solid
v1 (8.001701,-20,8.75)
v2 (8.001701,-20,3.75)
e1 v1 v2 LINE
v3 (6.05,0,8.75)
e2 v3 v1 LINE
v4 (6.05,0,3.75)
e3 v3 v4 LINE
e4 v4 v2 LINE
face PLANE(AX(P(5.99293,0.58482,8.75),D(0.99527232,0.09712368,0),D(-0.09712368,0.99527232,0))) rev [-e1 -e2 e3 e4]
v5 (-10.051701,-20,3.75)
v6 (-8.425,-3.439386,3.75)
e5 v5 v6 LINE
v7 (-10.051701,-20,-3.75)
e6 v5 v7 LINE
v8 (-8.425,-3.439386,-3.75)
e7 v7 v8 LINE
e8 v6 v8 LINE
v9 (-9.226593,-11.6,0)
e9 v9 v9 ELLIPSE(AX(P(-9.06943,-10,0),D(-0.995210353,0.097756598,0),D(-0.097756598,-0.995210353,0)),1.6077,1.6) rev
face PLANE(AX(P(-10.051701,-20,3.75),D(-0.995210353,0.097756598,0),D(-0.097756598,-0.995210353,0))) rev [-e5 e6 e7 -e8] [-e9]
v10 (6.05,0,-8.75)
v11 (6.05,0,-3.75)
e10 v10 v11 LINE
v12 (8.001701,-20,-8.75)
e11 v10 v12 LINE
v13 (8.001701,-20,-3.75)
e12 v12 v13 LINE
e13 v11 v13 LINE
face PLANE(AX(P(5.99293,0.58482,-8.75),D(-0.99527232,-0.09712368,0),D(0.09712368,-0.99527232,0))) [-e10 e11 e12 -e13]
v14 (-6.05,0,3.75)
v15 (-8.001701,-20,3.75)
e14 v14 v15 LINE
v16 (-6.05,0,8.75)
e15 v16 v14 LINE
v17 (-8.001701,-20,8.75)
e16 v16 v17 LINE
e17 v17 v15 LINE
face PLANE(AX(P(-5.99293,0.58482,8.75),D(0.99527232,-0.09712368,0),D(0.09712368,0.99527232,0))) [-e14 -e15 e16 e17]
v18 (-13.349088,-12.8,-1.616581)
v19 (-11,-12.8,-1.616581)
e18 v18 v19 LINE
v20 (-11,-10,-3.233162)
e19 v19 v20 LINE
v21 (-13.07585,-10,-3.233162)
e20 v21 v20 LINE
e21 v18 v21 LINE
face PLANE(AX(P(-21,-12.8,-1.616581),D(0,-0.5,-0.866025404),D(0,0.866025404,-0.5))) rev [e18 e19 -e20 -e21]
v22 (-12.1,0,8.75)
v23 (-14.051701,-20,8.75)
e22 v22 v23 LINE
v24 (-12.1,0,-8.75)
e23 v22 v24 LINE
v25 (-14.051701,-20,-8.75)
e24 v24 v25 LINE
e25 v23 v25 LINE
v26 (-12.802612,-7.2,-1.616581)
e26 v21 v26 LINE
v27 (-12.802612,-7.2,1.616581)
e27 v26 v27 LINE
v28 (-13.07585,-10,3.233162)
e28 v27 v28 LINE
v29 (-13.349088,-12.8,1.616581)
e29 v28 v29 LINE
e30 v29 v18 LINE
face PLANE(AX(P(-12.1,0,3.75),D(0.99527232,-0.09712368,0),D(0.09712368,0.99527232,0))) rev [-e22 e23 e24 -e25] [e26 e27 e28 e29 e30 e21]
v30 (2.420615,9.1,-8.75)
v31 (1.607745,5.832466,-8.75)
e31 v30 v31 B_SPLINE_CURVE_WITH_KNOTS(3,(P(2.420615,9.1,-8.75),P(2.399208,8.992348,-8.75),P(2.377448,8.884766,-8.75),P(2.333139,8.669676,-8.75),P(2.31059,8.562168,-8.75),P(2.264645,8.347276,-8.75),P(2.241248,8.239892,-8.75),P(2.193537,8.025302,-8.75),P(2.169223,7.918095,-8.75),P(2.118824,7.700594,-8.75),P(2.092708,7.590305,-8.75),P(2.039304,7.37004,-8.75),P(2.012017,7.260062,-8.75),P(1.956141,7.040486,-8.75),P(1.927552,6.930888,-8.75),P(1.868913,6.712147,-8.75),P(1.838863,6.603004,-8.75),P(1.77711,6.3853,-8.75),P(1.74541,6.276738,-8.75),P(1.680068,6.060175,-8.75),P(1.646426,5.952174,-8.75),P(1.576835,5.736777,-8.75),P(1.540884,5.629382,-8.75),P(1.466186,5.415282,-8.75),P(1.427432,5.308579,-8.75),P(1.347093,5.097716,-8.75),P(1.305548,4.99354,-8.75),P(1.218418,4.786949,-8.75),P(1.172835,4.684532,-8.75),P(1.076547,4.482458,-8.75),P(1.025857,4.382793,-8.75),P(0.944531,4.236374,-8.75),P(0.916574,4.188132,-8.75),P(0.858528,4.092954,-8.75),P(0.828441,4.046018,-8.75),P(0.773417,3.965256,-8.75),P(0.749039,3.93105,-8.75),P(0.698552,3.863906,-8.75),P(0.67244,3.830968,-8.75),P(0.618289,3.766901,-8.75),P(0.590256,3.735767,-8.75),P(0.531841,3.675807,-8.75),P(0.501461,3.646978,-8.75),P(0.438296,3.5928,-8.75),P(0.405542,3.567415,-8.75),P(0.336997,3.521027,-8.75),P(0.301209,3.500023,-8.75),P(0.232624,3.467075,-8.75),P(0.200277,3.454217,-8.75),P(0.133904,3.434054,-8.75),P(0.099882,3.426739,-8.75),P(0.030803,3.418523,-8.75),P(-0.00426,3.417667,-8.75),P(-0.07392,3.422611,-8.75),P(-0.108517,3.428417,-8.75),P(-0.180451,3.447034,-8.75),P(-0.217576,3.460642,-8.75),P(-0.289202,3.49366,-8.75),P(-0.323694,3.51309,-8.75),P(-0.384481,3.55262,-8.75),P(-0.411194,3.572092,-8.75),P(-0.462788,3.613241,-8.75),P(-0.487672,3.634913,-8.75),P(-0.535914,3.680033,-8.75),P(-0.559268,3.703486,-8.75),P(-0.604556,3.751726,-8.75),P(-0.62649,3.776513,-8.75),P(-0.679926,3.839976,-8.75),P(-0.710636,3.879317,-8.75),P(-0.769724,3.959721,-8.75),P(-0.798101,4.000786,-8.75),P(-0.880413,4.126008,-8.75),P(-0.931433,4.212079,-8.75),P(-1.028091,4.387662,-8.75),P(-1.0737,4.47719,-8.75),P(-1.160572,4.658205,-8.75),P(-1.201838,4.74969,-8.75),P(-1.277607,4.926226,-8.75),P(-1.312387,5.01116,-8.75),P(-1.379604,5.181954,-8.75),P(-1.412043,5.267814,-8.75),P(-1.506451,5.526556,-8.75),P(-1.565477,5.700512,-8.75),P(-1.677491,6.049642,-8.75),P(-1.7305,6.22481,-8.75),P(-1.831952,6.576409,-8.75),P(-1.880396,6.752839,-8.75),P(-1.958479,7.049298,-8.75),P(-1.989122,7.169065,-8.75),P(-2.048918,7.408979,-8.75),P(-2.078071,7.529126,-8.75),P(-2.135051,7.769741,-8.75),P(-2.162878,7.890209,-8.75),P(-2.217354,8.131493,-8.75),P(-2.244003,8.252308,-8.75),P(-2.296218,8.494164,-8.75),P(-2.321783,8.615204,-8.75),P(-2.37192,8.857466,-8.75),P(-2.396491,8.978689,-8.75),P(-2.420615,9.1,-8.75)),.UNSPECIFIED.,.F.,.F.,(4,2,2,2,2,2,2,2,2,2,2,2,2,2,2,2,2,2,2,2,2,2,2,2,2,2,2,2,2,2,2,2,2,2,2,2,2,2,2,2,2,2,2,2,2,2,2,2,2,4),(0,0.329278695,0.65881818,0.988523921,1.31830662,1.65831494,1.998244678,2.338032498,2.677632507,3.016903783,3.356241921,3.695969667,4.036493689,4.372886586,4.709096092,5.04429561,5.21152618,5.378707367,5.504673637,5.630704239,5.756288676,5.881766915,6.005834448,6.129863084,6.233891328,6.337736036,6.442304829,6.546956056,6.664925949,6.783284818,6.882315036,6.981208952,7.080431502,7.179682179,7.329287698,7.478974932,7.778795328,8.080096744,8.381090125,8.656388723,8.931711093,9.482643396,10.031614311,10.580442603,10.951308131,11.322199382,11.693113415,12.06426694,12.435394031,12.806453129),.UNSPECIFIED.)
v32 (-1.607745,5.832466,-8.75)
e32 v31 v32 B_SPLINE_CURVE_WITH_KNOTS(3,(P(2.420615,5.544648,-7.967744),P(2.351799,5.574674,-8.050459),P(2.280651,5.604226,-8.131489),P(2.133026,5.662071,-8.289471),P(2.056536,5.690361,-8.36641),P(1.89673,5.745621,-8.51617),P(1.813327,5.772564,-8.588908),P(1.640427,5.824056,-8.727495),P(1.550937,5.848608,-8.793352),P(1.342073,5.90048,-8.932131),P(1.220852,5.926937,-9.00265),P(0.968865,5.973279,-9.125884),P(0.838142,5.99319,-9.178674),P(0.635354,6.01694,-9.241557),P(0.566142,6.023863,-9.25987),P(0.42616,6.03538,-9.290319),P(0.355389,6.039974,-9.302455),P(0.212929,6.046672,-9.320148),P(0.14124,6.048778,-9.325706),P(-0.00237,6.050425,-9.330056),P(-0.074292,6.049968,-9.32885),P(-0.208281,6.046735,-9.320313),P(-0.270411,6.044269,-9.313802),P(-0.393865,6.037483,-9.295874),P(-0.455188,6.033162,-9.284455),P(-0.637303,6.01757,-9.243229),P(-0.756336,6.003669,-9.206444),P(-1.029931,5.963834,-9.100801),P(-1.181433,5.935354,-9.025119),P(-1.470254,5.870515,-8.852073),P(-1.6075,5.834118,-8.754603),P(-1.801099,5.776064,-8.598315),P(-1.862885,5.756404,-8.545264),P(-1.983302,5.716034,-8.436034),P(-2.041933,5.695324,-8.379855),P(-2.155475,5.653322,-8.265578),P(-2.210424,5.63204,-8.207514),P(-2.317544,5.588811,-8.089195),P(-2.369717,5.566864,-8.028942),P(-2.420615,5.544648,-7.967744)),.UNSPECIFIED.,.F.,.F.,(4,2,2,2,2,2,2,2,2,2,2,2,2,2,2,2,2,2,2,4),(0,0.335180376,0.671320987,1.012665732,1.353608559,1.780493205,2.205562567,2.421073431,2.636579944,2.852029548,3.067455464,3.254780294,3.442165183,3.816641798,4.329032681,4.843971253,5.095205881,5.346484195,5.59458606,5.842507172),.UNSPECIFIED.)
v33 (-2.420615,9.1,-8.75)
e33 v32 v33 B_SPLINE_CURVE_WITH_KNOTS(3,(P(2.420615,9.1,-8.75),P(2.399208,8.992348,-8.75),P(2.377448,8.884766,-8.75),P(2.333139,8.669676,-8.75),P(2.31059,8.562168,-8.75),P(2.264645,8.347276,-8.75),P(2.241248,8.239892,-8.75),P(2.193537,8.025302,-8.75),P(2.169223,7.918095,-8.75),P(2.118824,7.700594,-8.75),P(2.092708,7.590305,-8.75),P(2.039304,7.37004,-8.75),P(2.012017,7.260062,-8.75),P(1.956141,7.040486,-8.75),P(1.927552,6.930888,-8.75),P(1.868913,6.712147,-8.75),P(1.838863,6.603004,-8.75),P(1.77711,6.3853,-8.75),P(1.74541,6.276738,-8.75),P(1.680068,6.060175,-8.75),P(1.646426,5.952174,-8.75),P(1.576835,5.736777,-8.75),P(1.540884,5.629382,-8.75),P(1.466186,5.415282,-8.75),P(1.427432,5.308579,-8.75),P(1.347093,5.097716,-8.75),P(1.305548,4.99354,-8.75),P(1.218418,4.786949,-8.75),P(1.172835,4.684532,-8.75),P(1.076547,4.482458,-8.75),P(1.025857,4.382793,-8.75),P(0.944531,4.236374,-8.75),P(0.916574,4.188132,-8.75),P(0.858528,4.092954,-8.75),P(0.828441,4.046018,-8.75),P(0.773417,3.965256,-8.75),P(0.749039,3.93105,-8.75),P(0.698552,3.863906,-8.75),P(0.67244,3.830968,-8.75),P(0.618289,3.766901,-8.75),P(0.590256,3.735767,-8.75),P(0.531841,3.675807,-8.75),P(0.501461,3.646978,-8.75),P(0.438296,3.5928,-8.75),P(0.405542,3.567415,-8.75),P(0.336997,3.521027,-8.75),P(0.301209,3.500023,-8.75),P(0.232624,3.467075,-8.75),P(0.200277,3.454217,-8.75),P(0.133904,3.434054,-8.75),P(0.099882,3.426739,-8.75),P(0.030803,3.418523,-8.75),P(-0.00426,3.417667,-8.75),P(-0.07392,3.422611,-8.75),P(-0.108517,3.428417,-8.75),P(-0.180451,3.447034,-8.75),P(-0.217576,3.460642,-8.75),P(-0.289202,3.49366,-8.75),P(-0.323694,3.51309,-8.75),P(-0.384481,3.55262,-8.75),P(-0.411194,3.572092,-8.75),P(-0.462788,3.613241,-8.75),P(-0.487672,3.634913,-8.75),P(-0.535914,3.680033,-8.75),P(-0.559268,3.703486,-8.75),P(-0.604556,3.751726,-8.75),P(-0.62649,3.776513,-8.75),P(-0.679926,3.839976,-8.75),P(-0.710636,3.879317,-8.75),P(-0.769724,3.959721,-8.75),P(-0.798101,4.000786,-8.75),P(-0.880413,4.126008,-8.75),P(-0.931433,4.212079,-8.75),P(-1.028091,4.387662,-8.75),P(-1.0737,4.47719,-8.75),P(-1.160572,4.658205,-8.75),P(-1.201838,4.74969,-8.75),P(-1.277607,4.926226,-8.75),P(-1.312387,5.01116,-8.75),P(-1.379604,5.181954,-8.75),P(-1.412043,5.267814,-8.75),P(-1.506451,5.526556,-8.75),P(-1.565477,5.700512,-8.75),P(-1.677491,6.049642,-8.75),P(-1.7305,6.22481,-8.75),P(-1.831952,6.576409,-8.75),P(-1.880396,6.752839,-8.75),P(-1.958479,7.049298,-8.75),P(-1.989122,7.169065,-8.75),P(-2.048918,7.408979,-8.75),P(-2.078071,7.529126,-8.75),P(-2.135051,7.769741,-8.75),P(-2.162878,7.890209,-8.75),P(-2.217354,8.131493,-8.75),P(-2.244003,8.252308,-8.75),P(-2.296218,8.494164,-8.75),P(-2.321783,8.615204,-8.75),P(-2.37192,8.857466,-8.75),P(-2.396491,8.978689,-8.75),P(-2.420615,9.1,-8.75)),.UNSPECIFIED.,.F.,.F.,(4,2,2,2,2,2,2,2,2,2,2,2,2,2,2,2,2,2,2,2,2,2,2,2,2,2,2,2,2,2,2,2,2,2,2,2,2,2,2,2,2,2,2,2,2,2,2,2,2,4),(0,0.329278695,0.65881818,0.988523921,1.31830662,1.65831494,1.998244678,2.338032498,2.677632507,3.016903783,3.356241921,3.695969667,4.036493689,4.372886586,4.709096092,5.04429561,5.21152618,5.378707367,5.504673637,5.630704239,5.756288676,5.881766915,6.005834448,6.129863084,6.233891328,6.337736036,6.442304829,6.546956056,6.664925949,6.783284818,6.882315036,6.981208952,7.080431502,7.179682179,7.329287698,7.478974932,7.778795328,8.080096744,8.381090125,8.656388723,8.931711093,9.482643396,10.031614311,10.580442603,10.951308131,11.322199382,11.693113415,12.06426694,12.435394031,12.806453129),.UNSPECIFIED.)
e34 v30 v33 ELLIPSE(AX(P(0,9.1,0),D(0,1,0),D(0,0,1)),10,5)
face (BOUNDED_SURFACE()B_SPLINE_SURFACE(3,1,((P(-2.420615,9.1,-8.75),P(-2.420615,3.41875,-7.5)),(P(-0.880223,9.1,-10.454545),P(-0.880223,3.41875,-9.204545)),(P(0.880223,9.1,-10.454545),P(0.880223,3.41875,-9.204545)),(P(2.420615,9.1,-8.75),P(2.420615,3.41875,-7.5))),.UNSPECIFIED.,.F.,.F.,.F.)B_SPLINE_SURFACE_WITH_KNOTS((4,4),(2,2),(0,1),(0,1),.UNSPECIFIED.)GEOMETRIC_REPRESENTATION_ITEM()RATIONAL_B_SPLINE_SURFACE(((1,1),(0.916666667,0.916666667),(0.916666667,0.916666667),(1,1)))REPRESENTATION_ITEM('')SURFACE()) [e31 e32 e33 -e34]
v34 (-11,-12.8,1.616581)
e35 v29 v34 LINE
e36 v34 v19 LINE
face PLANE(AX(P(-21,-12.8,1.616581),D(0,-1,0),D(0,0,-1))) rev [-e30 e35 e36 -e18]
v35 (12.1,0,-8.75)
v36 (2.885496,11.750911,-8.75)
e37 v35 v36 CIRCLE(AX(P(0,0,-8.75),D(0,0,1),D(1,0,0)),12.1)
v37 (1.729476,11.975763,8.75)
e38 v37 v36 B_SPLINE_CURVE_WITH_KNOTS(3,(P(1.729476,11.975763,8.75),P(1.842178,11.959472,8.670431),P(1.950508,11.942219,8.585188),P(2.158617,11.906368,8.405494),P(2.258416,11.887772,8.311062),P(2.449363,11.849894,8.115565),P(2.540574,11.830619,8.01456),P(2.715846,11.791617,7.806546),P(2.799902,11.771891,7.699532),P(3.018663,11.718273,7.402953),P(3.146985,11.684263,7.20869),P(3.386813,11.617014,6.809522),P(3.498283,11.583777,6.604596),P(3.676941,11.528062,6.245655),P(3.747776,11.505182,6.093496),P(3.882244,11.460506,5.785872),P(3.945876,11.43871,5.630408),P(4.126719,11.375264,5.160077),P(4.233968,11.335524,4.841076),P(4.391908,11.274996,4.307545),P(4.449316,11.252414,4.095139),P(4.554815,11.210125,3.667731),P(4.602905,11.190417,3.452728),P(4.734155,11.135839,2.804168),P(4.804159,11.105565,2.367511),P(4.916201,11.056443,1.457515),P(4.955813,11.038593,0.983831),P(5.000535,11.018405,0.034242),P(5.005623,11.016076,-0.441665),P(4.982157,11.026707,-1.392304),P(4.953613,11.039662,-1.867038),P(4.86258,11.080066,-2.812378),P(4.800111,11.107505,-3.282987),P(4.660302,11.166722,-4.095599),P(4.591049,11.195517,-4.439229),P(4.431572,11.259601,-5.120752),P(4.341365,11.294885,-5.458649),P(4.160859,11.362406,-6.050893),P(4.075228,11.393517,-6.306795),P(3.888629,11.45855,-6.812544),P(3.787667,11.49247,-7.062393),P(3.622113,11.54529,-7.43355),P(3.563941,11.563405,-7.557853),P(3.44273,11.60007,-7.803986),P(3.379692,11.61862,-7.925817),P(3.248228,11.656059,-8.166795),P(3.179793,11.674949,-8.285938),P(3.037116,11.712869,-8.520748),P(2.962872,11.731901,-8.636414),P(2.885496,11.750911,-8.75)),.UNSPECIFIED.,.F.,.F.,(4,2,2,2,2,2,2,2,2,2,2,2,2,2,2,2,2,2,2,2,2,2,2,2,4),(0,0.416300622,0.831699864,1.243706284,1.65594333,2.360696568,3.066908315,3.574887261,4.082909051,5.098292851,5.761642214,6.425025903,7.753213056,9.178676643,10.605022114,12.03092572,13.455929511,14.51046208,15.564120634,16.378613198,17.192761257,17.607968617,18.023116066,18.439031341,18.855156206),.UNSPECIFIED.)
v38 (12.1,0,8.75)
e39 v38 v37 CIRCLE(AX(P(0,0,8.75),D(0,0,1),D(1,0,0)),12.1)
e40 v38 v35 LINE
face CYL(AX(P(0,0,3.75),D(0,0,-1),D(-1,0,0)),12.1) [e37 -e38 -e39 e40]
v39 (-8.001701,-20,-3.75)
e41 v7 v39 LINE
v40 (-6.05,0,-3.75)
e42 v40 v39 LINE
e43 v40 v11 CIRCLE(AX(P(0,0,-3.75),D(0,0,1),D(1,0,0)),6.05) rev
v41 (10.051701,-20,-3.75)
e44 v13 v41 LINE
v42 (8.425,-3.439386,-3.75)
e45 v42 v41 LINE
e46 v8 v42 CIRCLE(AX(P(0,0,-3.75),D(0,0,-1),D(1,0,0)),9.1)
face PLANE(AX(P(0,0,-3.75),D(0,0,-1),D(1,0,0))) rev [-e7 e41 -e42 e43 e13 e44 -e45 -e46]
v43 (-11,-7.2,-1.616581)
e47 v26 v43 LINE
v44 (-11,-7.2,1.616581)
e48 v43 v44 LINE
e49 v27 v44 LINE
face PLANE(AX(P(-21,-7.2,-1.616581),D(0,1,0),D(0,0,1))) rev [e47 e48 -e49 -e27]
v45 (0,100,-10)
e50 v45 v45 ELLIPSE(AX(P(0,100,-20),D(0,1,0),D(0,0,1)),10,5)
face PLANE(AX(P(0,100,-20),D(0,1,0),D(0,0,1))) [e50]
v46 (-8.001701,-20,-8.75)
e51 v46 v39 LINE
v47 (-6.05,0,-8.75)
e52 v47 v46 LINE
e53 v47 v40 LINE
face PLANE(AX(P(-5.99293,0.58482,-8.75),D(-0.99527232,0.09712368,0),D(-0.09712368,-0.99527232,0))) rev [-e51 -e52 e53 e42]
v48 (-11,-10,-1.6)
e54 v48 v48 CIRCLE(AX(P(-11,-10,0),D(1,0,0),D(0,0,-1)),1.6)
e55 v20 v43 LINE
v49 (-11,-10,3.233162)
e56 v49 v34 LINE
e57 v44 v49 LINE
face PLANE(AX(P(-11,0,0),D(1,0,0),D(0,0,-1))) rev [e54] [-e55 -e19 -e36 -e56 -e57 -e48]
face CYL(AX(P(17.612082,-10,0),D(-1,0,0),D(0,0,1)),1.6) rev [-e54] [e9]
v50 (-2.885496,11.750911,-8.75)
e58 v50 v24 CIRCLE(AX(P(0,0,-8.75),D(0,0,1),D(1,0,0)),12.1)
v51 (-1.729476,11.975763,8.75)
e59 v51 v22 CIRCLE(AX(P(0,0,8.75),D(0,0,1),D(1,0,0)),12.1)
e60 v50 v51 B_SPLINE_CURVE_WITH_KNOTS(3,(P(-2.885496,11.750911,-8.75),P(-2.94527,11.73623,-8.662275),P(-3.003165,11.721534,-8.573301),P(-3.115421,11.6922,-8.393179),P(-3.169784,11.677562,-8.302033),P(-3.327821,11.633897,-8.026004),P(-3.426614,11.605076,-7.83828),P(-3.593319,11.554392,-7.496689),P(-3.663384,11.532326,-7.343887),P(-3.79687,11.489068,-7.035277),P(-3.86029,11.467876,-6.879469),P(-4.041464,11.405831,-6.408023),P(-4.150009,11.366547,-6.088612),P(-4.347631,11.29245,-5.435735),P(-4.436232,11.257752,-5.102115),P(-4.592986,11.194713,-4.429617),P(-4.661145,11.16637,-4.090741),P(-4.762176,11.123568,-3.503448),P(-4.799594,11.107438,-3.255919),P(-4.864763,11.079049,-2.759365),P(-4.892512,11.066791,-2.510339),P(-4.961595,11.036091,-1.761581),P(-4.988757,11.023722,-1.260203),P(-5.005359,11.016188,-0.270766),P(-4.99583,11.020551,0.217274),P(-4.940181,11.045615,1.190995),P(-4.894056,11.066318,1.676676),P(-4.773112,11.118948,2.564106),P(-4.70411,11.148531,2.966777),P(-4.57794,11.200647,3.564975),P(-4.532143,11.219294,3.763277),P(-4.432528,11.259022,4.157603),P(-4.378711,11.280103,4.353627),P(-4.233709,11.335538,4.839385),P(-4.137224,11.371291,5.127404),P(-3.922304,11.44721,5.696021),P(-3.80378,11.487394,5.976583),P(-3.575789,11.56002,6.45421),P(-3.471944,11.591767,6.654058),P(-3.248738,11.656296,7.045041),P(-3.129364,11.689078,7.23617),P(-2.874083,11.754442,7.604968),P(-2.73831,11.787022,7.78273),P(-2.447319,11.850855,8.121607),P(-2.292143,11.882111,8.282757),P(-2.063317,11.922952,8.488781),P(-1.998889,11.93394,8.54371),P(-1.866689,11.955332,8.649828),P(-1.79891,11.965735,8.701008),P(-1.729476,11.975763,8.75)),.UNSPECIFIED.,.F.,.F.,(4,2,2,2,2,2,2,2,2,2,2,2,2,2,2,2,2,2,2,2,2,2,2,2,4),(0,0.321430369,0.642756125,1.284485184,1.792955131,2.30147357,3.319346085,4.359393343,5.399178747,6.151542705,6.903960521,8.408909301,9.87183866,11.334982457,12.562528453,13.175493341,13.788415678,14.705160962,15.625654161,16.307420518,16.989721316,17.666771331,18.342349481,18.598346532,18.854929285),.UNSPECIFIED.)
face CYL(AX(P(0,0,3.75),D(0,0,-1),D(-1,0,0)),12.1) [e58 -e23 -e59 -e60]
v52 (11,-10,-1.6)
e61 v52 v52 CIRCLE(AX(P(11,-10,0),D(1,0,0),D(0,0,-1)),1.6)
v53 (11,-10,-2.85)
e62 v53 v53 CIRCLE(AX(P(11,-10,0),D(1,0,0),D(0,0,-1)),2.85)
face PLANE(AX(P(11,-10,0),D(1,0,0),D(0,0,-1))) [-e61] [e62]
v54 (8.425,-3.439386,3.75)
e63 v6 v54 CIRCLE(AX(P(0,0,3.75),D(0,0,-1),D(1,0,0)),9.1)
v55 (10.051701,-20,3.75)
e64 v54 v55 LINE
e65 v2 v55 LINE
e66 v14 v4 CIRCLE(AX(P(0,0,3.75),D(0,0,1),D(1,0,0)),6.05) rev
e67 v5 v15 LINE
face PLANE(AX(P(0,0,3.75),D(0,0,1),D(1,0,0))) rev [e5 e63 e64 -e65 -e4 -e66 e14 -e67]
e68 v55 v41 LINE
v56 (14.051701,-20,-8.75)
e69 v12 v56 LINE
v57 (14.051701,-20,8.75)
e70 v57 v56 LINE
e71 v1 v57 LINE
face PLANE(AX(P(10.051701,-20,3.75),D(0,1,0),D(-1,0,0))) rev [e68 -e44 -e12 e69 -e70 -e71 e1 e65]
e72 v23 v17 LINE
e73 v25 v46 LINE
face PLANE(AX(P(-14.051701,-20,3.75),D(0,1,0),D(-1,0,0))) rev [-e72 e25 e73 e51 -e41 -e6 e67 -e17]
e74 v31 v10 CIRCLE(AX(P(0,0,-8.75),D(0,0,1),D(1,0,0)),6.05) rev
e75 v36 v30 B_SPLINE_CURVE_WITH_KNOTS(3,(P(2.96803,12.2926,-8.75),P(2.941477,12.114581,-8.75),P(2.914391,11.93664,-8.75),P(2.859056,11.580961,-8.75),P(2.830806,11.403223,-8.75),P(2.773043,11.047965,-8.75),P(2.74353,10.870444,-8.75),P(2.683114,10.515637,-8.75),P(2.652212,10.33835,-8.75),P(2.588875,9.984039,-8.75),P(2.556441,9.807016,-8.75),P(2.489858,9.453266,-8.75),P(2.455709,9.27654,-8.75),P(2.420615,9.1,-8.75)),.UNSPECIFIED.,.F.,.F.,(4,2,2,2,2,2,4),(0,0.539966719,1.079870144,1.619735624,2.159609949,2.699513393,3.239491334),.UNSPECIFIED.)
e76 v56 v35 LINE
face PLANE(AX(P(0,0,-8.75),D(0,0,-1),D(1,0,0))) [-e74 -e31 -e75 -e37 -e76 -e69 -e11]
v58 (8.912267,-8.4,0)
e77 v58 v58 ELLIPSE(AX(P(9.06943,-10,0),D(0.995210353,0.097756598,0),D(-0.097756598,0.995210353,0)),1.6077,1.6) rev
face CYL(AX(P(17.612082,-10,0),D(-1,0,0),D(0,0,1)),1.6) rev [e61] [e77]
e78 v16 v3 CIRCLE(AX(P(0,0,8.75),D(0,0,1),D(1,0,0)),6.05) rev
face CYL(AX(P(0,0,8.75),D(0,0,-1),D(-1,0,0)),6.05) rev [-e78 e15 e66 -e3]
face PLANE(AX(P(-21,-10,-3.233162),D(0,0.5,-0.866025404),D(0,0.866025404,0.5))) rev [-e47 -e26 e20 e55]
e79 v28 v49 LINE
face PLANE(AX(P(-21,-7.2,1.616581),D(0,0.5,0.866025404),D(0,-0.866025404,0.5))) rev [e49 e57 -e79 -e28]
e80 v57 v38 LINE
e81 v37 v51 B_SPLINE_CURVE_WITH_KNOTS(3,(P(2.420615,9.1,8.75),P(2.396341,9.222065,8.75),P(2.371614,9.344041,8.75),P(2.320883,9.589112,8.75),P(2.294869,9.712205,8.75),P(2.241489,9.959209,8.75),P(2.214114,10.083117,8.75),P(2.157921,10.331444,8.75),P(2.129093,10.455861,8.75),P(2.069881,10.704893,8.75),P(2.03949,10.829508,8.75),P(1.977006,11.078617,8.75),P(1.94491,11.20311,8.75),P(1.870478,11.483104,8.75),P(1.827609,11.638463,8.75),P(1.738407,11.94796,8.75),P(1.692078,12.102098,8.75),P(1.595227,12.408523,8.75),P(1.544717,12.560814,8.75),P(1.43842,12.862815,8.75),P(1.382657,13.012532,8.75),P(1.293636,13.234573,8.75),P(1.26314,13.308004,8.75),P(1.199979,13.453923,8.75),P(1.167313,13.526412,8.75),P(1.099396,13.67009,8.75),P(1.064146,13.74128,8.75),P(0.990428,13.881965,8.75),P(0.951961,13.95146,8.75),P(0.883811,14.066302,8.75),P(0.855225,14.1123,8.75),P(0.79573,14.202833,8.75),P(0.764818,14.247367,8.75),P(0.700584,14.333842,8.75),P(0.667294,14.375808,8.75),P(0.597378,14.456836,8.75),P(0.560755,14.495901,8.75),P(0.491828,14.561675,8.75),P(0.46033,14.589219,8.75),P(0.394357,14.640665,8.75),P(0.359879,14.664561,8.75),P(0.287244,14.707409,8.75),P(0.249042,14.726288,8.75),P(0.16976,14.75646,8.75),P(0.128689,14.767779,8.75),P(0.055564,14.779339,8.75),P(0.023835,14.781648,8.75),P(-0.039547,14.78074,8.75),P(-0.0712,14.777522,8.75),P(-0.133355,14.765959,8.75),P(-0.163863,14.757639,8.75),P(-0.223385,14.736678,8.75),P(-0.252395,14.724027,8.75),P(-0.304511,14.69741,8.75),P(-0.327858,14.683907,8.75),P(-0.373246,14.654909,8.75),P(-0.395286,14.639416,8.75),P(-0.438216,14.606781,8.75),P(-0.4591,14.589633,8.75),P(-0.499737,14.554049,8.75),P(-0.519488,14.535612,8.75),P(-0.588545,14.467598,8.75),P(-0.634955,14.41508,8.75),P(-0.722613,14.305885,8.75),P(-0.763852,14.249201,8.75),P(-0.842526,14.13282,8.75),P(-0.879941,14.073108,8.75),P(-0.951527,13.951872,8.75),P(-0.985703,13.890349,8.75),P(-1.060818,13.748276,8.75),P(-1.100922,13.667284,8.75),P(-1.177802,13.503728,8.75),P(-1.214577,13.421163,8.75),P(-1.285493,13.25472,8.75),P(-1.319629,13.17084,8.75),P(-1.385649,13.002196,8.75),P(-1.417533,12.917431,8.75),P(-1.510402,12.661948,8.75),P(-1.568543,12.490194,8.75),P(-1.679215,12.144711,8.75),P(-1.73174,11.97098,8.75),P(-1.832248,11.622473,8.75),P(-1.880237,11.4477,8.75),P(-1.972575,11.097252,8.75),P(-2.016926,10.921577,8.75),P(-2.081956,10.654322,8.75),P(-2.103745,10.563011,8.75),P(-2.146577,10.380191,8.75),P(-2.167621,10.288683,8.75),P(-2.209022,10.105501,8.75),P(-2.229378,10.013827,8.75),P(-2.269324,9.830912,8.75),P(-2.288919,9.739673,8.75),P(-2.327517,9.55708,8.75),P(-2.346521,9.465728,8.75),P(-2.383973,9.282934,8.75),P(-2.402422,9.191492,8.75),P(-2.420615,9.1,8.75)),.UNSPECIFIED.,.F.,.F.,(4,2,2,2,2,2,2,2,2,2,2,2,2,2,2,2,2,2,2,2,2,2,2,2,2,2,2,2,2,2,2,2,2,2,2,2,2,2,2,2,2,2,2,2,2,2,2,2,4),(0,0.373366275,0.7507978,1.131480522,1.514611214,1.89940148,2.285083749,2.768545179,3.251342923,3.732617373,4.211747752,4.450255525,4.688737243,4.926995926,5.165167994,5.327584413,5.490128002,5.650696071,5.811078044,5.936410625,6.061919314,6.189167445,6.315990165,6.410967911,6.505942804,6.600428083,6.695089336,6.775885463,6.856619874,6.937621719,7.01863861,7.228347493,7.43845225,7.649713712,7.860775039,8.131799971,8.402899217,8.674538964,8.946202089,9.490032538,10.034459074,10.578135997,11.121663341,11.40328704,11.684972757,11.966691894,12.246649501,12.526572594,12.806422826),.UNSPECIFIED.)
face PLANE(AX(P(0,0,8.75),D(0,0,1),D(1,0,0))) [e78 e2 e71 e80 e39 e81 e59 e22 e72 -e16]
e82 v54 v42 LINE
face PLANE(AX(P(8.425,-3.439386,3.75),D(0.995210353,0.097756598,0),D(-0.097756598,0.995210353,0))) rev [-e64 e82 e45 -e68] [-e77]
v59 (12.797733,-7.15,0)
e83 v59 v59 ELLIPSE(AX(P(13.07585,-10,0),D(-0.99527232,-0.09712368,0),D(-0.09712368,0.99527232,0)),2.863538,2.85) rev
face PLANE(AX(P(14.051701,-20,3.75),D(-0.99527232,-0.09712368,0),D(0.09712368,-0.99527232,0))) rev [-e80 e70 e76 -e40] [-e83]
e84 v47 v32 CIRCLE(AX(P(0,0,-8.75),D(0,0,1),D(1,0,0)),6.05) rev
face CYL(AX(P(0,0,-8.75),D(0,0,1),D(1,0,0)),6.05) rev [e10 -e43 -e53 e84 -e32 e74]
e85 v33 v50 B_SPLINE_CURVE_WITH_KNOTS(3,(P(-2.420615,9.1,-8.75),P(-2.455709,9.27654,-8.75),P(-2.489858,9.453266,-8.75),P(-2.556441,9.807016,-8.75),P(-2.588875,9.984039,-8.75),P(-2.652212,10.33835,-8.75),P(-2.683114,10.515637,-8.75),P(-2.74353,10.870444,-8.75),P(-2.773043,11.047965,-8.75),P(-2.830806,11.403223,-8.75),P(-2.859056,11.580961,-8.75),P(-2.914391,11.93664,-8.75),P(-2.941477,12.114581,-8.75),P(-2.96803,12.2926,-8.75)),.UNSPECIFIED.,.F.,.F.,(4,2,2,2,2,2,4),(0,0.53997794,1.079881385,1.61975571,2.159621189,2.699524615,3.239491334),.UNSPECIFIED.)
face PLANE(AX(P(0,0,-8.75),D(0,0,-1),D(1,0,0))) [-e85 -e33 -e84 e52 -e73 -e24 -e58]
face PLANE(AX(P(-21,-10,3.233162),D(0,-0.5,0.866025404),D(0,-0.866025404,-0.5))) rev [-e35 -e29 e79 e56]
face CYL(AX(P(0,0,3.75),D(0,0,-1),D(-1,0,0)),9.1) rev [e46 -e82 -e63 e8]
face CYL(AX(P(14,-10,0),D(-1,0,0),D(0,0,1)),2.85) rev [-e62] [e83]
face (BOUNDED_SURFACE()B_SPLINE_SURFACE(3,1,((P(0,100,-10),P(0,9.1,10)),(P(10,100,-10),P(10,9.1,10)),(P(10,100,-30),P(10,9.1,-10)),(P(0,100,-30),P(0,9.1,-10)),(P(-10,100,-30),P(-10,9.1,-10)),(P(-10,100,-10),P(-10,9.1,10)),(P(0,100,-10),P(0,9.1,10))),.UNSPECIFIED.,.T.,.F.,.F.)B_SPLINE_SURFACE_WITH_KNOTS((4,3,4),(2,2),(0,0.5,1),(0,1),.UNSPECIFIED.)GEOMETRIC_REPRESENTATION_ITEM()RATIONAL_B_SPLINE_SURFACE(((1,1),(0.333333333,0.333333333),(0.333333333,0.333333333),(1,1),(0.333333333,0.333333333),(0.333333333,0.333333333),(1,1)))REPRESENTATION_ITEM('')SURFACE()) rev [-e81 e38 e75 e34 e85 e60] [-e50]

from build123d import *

# Parameters (mm, degrees)
BOSS_EXTRUDE1_DEPTH         = 3.75
BOLT_HOLE_REACH             = 26.729
SKETCH2_R                   = 1.6
BOLT_HOLE_DIRECTION_2_REACH = 26.729
BOSS_EXTRUDE2_START         = 5
BOSS_EXTRUDE2_DEPTH         = 5
CUT_EXTRUDE2_START          = 11
SKETCH4_R                   = 2.85
CUT_EXTRUDE2_DEPTH          = 3
SKETCH7_RX                  = 10
SKETCH7_RY                  = 5
SKETCH11_W                  = 7.251223943
SKETCH11_H                  = 3.177760732
CUT_EXTRUDE3_DEPTH          = 20
CUT_EXTRUDE7_START          = -11
CUT_EXTRUDE7_DEPTH          = 10
CUT_EXTRUDE8_START          = -1.25
CUT_EXTRUDE8_DEPTH          = 1.828931


with BuildPart() as part:
    # Sketch1 → Boss-Extrude1 (new, symmetric)
    with BuildSketch(Plane.XY):
        with BuildLine():
            Line((-12.1, 0), (-14.051700625, -20))
            Line((-14.051700625, -20), (-10.051700625, -20))
            Line((-10.051700625, -20), (-8.425, -3.439385846))
            ThreePointArc((-8.425, -3.439385846), (0, 9.1), (8.425, -3.439385846))
            Line((8.425, -3.439385846), (10.051700625, -20))
            Line((10.051700625, -20), (14.051700625, -20))
            Line((14.051700625, -20), (12.1, 0))
            ThreePointArc((12.1, 0), (0, 12.1), (-12.1, 0))
        make_face()
    extrude(amount=BOSS_EXTRUDE1_DEPTH, both=True)

    # Bolt Hole: up to this plane
    bolt_hole_end = Plane(origin=(14.051700625, -20, 3.75), z_dir=(-0.995272319868323, -0.09712368044883128, 0))
    # Sketch2 → Bolt Hole (cut, up to the surface)
    with BuildSketch(Plane(origin=(0, 0, 0), x_dir=(0, 0, -1), z_dir=(1, 0, 0)), mode=Mode.PRIVATE) as bolt_hole_sk1:
        with Locations(Location((0, -10, 0), (0, 0, 90))):
            Circle(SKETCH2_R)
    bolt_hole_tool1 = split(extrude(bolt_hole_sk1.sketch, amount=BOLT_HOLE_REACH, mode=Mode.PRIVATE), bisect_by=bolt_hole_end, keep=Keep.BOTH, mode=Mode.PRIVATE)
    add(bolt_hole_tool1.solids().sort_by_distance((0, -10, 0))[0], mode=Mode.SUBTRACT)

    # Bolt Hole direction 2: up to this plane
    bolt_hole_direction_2_end = Plane(origin=(-12.1, 0, 3.75), z_dir=(0.995272319868323, -0.09712368044883138, 0))
    # Sketch2 → Bolt Hole direction 2 (cut, up to the surface)
    with BuildSketch(Plane(origin=(0, 0, 0), x_dir=(0, 0, -1), z_dir=(1, 0, 0)), mode=Mode.PRIVATE) as bolt_hole_direction_2_sk1:
        with Locations(Location((0, -10, 0), (0, 0, 90))):
            Circle(SKETCH2_R)
    bolt_hole_direction_2_tool1 = split(extrude(bolt_hole_direction_2_sk1.sketch, amount=-BOLT_HOLE_DIRECTION_2_REACH, mode=Mode.PRIVATE), bisect_by=bolt_hole_direction_2_end, keep=Keep.BOTH, mode=Mode.PRIVATE)
    add(bolt_hole_direction_2_tool1.solids().sort_by_distance((0, -10, 0))[0], mode=Mode.SUBTRACT)

    # Sketch3 → Boss-Extrude2 (add)
    with BuildSketch(Plane.XY.offset(3.75).offset(BOSS_EXTRUDE2_START)):
        with BuildLine():
            ThreePointArc((12.1, 0), (0, 12.1), (-12.1, 0))
            Line((-12.1, 0), (-6.05, 0))
            ThreePointArc((-6.05, 0), (0, 6.05), (6.05, 0))
            Line((6.05, 0), (12.1, 0))
        make_face()
        Polygon((-6.05, 0), (-12.1, 0), (-14.051700625, -20), (-8.001700625, -20), align=None)
        Polygon((14.051700625, -20), (12.1, 0), (6.05, 0), (8.001700625, -20), align=None)
    boss_extrude2 = extrude(amount=-BOSS_EXTRUDE2_DEPTH)

    # Sketch4 → Cut-Extrude2 (cut)
    with BuildSketch(Plane(origin=(0, 0, 0), x_dir=(0, 0, -1), z_dir=(1, 0, 0)).offset(CUT_EXTRUDE2_START)):
        with Locations(Location((0, -10, 0), (0, 0, 90))):
            Circle(SKETCH4_R)
    extrude(amount=CUT_EXTRUDE2_DEPTH, mode=Mode.SUBTRACT)

    # Sweep1: sweep along a path in Sketch8
    with BuildLine(Plane(origin=(0, 0, 0), x_dir=(0, 0, -1), z_dir=(1, 0, 0))) as sweep1_path:
        Line((20, 100), (0, 9.1))
    # Sketch7 → Sweep1 (sweep)
    with BuildSketch(Plane(origin=(0, 100, 0), x_dir=(1, 0, 0), z_dir=(0, 1, 0))):
        with Locations(Location((0, 20), (0, 0, -90))):
            Ellipse(SKETCH7_RX, SKETCH7_RY)
    sweep(path=sweep1_path.line)

    # Mirror2: Boss-Extrude2 across plane
    add(boss_extrude2.mirror(Plane.XY))

    # Sweep2: read off the stored shape, not the designer's step
    # Sweep2: loft between two sections, ruled curve by curve
    sweep2_from = [
        Edge.make_bspline([(-2.420614591, 9.1, -8.75), (-0.880223488, 9.1, -10.454545455), (0.880223488, 9.1, -10.454545455), (2.420614591, 9.1, -8.75)], [0, 0, 0, 0, 1, 1, 1, 1], 3, [1, 0.916666667, 0.916666667, 1]),
        Edge.make_line((2.420614591, 9.1, -8.75), (-2.420614591, 9.1, -8.75)),
    ]
    sweep2_to = [
        Edge.make_bspline([(-2.420614591, 3.41875, -7.5), (-0.880223488, 3.41875, -9.204545455), (0.880223488, 3.41875, -9.204545455), (2.420614591, 3.41875, -7.5)], [0, 0, 0, 0, 1, 1, 1, 1], 3, [1, 0.916666667, 0.916666667, 1]),
        Edge.make_line((2.420614591, 3.41875, -7.5), (-2.420614591, 3.41875, -7.5)),
    ]
    sweep2 = Solid(Shell([*[Face.make_surface_from_curves(sweep2_from[k], sweep2_to[k]) for k in range(2)], Face(Wire(sweep2_from)), Face(Wire(sweep2_to))]))
    add(sweep2)

    # Sketch11 → Cut-Extrude3 (cut)
    with BuildSketch(Plane(origin=(0, 0, 0), x_dir=(1, 0, 0), z_dir=(0, 1, 0))):
        with Locations((-0.008642554, -10.338880366)):
            Rectangle(SKETCH11_W, SKETCH11_H)
    extrude(amount=CUT_EXTRUDE3_DEPTH, mode=Mode.SUBTRACT)

    # Sketch14 → Cut-Extrude7 (cut)
    with BuildSketch(Plane(origin=(0, 0, 0), x_dir=(0, 0, -1), z_dir=(1, 0, 0)).offset(CUT_EXTRUDE7_START)):
        Polygon((-3.233161507, -10), (-1.616580754, -12.8), (1.616580754, -12.8), (3.233161507, -10), (1.616580754, -7.2), (-1.616580754, -7.2), align=None)
    extrude(amount=-CUT_EXTRUDE7_DEPTH, mode=Mode.SUBTRACT)

    # Sketch18 → Cut-Extrude8 (cut)
    with BuildSketch(Plane(origin=(0, 0, -8.75), x_dir=(-1, 0, 0), z_dir=(0, 0, -1)).offset(CUT_EXTRUDE8_START)):
        with BuildLine():
            Line((-6.05, 0), (6.05, 0))
            ThreePointArc((6.05, 0), (0, 6.05), (-6.05, 0))
        make_face()
    extrude(amount=CUT_EXTRUDE8_DEPTH, mode=Mode.SUBTRACT)


solid = part.part
